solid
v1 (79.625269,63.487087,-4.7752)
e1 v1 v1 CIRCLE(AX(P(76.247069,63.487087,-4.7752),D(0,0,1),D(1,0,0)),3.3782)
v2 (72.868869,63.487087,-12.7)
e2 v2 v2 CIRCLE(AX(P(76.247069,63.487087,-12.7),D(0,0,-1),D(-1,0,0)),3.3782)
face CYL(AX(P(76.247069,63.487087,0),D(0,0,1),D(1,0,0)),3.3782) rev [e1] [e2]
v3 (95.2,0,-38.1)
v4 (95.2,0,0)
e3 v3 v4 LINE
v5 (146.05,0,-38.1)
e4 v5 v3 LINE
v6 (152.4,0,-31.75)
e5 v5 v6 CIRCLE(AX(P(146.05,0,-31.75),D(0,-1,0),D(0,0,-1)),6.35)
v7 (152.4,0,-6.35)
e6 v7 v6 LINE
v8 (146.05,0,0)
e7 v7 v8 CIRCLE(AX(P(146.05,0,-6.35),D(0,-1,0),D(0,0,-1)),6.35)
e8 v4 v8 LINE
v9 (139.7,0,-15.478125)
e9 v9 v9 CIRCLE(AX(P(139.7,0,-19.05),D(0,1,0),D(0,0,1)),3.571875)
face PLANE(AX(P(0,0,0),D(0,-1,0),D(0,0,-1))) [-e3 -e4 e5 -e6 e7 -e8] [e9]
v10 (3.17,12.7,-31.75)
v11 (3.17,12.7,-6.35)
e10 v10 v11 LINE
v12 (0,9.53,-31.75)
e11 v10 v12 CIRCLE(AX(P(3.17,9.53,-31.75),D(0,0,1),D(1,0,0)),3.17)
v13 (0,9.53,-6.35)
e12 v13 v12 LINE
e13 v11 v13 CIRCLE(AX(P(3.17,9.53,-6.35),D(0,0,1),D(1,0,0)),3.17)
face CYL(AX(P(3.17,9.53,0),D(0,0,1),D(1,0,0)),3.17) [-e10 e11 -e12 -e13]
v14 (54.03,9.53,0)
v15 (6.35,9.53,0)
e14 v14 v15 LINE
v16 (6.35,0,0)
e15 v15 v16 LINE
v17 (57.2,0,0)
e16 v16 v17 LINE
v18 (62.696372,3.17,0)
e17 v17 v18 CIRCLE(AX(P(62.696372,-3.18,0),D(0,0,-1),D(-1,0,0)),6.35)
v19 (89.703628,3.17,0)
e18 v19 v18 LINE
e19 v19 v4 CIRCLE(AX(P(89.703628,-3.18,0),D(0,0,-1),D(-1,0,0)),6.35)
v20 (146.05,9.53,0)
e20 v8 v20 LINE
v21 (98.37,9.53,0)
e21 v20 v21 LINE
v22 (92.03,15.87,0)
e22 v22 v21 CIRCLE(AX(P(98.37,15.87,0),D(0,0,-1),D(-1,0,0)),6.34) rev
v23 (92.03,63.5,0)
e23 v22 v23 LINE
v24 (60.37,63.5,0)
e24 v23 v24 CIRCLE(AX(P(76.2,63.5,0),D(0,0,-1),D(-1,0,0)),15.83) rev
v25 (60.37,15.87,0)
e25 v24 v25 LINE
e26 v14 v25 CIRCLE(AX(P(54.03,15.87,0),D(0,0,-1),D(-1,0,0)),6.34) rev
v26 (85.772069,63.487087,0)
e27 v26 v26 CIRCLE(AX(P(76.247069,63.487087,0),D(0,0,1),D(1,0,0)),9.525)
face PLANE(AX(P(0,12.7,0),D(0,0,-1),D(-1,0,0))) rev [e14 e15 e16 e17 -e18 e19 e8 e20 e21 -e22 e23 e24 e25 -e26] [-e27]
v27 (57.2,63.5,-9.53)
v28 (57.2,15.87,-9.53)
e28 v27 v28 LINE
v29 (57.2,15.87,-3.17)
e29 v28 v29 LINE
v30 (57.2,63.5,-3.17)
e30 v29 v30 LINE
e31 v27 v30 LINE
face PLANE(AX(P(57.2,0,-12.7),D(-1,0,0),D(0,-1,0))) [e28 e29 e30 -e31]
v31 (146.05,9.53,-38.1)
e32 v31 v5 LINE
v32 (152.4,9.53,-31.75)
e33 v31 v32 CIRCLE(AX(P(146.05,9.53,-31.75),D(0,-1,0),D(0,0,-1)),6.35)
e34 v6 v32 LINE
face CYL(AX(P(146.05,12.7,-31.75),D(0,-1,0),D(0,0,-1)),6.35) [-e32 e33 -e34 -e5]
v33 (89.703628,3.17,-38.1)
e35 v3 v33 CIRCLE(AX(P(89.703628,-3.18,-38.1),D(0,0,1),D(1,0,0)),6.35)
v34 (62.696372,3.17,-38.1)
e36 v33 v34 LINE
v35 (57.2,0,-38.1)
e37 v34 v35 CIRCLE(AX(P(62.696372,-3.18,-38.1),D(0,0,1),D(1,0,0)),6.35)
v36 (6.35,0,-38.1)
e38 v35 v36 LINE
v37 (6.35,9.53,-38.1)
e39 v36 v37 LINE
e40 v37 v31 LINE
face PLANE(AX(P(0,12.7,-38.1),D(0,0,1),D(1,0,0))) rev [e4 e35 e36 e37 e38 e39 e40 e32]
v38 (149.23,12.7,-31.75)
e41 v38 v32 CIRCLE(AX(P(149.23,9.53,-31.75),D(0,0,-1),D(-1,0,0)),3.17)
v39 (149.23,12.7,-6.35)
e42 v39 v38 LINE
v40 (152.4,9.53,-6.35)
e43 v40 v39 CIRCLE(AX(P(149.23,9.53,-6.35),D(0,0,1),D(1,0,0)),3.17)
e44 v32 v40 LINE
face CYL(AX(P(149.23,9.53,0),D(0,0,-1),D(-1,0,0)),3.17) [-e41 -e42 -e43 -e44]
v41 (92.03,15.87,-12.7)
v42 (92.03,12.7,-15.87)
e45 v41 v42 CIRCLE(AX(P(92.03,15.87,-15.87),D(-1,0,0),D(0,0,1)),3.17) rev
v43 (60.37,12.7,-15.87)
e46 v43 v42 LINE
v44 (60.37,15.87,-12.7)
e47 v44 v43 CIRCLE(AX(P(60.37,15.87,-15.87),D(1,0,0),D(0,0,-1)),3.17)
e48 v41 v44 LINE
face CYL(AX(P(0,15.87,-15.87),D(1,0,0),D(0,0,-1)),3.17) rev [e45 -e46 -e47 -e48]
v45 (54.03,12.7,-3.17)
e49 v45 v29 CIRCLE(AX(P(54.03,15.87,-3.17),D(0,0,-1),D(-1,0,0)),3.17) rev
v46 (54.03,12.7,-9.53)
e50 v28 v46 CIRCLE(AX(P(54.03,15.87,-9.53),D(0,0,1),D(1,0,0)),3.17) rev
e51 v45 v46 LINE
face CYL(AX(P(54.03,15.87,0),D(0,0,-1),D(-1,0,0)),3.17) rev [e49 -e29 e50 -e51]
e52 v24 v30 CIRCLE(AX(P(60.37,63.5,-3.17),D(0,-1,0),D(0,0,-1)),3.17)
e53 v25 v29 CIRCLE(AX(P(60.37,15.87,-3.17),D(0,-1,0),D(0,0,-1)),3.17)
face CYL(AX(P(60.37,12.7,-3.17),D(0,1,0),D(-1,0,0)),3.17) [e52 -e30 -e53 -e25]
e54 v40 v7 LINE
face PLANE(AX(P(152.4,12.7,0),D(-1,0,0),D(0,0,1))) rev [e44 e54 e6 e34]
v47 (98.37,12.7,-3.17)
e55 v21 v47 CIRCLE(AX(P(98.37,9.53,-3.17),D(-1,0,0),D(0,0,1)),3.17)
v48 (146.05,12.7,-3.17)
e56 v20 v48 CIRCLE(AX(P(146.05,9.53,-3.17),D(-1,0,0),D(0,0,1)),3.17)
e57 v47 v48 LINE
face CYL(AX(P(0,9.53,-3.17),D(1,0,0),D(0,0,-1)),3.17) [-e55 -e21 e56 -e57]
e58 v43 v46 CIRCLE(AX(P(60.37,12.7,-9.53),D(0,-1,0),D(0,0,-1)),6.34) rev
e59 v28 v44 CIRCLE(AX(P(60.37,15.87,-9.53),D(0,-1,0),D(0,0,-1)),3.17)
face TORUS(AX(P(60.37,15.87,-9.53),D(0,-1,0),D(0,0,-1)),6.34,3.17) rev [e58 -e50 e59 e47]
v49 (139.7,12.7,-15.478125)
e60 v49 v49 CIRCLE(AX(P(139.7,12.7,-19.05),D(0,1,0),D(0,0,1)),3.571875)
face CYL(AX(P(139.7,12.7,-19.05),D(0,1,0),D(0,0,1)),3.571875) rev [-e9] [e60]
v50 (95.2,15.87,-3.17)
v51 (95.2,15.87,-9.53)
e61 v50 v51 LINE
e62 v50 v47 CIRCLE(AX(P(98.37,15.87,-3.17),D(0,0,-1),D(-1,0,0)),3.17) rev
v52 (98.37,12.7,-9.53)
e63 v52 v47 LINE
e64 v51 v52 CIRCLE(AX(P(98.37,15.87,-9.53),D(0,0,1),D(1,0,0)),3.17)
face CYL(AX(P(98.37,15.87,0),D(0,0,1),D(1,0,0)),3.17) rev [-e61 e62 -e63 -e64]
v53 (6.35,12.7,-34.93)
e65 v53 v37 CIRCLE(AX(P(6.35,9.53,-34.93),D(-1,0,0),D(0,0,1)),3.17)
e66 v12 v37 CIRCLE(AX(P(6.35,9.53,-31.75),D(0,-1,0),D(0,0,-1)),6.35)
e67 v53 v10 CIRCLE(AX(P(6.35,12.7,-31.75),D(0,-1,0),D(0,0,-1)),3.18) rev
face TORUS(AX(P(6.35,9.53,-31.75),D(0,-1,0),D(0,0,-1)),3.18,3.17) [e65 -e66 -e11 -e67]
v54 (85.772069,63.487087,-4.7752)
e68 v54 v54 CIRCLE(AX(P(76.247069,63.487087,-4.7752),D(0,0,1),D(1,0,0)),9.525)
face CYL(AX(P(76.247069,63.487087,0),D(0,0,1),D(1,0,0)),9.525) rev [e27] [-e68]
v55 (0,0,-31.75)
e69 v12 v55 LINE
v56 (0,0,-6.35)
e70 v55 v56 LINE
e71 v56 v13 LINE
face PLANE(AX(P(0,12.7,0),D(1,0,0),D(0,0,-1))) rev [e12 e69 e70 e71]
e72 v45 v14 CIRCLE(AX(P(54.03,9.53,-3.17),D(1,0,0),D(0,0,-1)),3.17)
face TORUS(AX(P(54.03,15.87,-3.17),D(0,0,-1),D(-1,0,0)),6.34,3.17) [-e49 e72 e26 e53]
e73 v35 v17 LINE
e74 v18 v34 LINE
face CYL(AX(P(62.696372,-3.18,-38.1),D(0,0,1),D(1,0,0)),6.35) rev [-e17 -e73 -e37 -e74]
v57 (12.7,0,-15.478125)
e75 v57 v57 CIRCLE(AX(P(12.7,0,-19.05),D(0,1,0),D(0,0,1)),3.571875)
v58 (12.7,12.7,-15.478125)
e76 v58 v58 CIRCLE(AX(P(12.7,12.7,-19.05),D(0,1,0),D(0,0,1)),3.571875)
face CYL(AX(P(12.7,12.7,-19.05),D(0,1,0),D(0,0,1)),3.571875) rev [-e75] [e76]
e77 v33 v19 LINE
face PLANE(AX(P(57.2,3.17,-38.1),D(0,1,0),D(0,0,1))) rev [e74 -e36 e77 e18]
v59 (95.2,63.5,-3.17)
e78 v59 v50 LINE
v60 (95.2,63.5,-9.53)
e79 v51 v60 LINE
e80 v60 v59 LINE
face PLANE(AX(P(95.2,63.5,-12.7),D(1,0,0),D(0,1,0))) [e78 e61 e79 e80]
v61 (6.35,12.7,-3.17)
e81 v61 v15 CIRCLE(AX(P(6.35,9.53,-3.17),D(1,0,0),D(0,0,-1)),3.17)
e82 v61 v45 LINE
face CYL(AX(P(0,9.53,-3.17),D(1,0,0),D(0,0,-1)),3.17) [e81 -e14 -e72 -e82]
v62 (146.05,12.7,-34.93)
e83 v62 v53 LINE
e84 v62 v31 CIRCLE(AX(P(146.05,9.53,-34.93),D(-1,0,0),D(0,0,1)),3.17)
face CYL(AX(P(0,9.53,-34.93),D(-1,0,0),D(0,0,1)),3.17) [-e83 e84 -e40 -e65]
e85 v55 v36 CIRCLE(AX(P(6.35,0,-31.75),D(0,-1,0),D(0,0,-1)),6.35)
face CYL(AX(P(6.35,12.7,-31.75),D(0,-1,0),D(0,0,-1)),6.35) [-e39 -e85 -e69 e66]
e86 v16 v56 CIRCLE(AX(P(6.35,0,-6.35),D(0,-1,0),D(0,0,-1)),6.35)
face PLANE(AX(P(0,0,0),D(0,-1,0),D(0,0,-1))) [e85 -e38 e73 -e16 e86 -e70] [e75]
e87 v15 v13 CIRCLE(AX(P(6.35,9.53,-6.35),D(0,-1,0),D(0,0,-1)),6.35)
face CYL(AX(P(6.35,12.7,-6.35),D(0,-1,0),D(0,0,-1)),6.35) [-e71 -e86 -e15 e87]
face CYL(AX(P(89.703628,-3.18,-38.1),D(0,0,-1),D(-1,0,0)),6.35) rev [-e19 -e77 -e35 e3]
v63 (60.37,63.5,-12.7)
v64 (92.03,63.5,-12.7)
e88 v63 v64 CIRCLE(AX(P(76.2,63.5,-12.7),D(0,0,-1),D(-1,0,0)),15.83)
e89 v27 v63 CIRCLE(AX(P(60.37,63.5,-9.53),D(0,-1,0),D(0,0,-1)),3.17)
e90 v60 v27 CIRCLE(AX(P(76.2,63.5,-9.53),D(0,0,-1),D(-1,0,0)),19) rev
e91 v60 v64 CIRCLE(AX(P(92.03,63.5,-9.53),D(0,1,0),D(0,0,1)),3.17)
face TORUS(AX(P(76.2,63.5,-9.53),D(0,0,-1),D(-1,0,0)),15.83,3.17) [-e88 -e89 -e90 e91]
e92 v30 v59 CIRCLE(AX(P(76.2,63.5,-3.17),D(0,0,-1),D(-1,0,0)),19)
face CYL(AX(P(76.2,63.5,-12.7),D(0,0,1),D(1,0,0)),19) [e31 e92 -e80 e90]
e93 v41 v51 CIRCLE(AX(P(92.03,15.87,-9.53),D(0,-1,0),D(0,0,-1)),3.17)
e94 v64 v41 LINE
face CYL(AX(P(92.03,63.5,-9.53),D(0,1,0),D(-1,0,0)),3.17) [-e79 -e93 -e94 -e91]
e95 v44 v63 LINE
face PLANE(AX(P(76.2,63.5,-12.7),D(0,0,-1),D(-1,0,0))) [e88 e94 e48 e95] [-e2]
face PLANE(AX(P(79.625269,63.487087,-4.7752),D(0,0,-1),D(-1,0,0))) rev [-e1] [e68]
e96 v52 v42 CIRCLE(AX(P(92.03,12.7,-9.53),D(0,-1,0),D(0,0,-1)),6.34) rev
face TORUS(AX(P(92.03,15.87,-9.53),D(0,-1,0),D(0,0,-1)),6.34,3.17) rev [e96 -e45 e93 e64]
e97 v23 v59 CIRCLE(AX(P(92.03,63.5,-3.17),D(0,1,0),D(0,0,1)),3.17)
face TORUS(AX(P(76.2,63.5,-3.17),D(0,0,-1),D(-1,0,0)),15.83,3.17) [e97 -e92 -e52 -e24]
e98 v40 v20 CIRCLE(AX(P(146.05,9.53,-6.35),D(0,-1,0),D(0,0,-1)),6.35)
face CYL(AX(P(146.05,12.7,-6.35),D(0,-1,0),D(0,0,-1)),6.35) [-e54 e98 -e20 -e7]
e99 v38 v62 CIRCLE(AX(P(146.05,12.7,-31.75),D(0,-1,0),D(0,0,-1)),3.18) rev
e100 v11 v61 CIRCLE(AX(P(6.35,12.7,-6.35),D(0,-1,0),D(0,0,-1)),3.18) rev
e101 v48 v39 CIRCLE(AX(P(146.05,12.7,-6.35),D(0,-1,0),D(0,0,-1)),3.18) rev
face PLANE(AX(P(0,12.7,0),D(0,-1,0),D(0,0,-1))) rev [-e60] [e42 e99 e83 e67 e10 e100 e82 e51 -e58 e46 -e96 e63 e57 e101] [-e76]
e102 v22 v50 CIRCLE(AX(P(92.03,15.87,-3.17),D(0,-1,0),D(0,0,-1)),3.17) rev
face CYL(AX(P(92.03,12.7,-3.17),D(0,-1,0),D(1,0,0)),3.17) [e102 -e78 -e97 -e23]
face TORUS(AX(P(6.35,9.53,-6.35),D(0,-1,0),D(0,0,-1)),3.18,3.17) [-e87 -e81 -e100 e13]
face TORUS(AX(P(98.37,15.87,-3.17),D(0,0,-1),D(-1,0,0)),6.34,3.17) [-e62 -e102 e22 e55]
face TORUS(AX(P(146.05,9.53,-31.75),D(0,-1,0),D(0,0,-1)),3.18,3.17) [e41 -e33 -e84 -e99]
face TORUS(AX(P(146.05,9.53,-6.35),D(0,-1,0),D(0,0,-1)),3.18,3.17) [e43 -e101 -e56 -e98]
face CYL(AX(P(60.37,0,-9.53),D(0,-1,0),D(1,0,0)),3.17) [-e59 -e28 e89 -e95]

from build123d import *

# Parameters (mm, degrees)
SKETCH1_W                                = 152.4
SKETCH1_H                                = 38.1
BASEPLATE_DEPTH                          = 12.7
VERTBOSS_DEPTH                           = 12.7
F_9_32_0_28125_DIAMETER_HOLE1_D          = 7.14375
CBORE_FOR_1_4_HEX_HEAD_BOLT1_D           = 6.7564
CBORE_FOR_1_4_HEX_HEAD_BOLT1_CBORE_D     = 19.05
CBORE_FOR_1_4_HEX_HEAD_BOLT1_CBORE_DEPTH = 4.7752
SKETCH11_W                               = 38
SKETCH11_H                               = 3.17
BOTTOMSLOT_DEPTH                         = 178.43624207
FILLET1_R                                = 6.35
FILLET2_R                                = 3.17


with BuildPart() as part:
    # Sketch1 → BasePlate (new body)
    with BuildSketch(Plane(origin=(0, 0, 0), x_dir=(1, 0, 0), z_dir=(0, 1, 0))):
        with Locations((76.2, 19.05)):
            Rectangle(SKETCH1_W, SKETCH1_H)
    extrude(amount=BASEPLATE_DEPTH)

    # Sketch3 → VertBoss (add)
    with BuildSketch(Plane.XY):
        with BuildLine():
            Line((57.2, 0), (57.2, 63.5))
            ThreePointArc((57.2, 63.5), (76.2, 82.5), (95.2, 63.5))
            Line((95.2, 63.5), (95.2, 0))
            Line((95.2, 0), (57.2, 0))
        make_face()
    extrude(amount=-VERTBOSS_DEPTH)

    # 9/32 (0.28125) Diameter Hole1 (through all)
    with Locations(Plane(origin=(0, 12.7, 0), x_dir=(1, 0, 0), z_dir=(0, 1, 0))):
        with Locations((139.7, 19.05), (12.7, 19.05)):
            Hole(F_9_32_0_28125_DIAMETER_HOLE1_D / 2)

    # CBORE for 1/4 Hex Head Bolt1 (through all)
    with Locations(Plane.XY):
        with Locations((76.24706856, 63.487087048)):
            CounterBoreHole(CBORE_FOR_1_4_HEX_HEAD_BOLT1_D / 2, CBORE_FOR_1_4_HEX_HEAD_BOLT1_CBORE_D / 2, CBORE_FOR_1_4_HEX_HEAD_BOLT1_CBORE_DEPTH)

    # Sketch11 → BottomSlot (cut, through all)
    with BuildSketch(Plane.XY):
        with Locations((76.2, 1.585)):
            Rectangle(SKETCH11_W, SKETCH11_H)
    extrude(amount=-BOTTOMSLOT_DEPTH, mode=Mode.SUBTRACT)

    # Fillet1
    # the kernel refuses this fillet: 6.35 mm, written as the material it adds along each edge
    with BuildSketch(Plane(origin=(95.2, 3.17, 0), x_dir=(-1, 0, 0), z_dir=(0, 0, -1))) as fillet1_piece_1:
        with BuildLine():
            CenterArc((5.49637153, -6.35), FILLET1_R, 90, 59.947892244)
            Line((0, -3.17), (0, 0))
            Line((0, 0), (5.49637153, 0))
        make_face()
    extrude(amount=38.1)
    with BuildSketch(Plane(origin=(57.2, 3.17, 0), x_dir=(0, -1, 0), z_dir=(0, 0, -1))) as fillet1_piece_2:
        with BuildLine():
            CenterArc((6.35, -5.49637153), FILLET1_R, 120.052107756, 59.947892244)
            Line((0, -5.49637153), (0, 0))
            Line((0, 0), (3.17, 0))
        make_face()
    extrude(amount=38.1)
    # the kernel refuses this fillet: 6.35 mm, written as the material it takes off along each edge
    with BuildSketch(Plane(origin=(0, -15.875, -38.1), x_dir=(0, 0, 1), z_dir=(0, 1, 0)), Plane(origin=(0, -15.875, 0), x_dir=(1, 0, 0), z_dir=(0, 1, 0))) as fillet1_2_piece_1:
        with BuildLine():
            CenterArc((FILLET1_R, FILLET1_R), FILLET1_R, 180, 90)
            Line((0, FILLET1_R), (0, 0))
            Line((0, 0), (FILLET1_R, 0))
        make_face()
    extrude(amount=44.45, mode=Mode.SUBTRACT)
    with BuildSketch(Plane(origin=(152.4, -15.875, -38.1), x_dir=(0, 0, 1), z_dir=(0, 1, 0)), Plane(origin=(152.4, -15.875, 0), x_dir=(-1, 0, 0), z_dir=(0, 1, 0))) as fillet1_2_piece_2:
        with BuildLine():
            CenterArc((FILLET1_R, -FILLET1_R), FILLET1_R, 90, 90)
            Line((0, -FILLET1_R), (0, 0))
            Line((0, 0), (FILLET1_R, 0))
        make_face()
    extrude(amount=44.45, mode=Mode.SUBTRACT)

    # Fillet2
    fillet2_edges = [part.edges().sort_by_distance(p)[0] for p in [
        (120.625, 12.7, 0),
        (57.2, 38.1, -12.7),
        (95.2, 38.1, -12.7),
        (57.2, 38.1, 0),
        (95.2, 38.1, 0),
        (76.2, 82.5, 0),
        (57.2, 12.7, -6.35),
        (76.2, 82.5, -12.7),
        (95.2, 12.7, -6.35),
        (76.2, 12.7, -12.7),
        (0, 12.7, -19.05),
        (76.2, 12.7, -38.1),
        (31.775, 12.7, 0),
        (152.4, 12.7, -19.05),
        (150.540128061, 12.7, -1.859871939),
        (150.540128061, 12.7, -36.240128061),
        (1.859871939, 12.7, -1.859871939),
        (1.859871939, 12.7, -36.240128061),
    ]]
    fillet(fillet2_edges, radius=FILLET2_R)


solid = part.part
